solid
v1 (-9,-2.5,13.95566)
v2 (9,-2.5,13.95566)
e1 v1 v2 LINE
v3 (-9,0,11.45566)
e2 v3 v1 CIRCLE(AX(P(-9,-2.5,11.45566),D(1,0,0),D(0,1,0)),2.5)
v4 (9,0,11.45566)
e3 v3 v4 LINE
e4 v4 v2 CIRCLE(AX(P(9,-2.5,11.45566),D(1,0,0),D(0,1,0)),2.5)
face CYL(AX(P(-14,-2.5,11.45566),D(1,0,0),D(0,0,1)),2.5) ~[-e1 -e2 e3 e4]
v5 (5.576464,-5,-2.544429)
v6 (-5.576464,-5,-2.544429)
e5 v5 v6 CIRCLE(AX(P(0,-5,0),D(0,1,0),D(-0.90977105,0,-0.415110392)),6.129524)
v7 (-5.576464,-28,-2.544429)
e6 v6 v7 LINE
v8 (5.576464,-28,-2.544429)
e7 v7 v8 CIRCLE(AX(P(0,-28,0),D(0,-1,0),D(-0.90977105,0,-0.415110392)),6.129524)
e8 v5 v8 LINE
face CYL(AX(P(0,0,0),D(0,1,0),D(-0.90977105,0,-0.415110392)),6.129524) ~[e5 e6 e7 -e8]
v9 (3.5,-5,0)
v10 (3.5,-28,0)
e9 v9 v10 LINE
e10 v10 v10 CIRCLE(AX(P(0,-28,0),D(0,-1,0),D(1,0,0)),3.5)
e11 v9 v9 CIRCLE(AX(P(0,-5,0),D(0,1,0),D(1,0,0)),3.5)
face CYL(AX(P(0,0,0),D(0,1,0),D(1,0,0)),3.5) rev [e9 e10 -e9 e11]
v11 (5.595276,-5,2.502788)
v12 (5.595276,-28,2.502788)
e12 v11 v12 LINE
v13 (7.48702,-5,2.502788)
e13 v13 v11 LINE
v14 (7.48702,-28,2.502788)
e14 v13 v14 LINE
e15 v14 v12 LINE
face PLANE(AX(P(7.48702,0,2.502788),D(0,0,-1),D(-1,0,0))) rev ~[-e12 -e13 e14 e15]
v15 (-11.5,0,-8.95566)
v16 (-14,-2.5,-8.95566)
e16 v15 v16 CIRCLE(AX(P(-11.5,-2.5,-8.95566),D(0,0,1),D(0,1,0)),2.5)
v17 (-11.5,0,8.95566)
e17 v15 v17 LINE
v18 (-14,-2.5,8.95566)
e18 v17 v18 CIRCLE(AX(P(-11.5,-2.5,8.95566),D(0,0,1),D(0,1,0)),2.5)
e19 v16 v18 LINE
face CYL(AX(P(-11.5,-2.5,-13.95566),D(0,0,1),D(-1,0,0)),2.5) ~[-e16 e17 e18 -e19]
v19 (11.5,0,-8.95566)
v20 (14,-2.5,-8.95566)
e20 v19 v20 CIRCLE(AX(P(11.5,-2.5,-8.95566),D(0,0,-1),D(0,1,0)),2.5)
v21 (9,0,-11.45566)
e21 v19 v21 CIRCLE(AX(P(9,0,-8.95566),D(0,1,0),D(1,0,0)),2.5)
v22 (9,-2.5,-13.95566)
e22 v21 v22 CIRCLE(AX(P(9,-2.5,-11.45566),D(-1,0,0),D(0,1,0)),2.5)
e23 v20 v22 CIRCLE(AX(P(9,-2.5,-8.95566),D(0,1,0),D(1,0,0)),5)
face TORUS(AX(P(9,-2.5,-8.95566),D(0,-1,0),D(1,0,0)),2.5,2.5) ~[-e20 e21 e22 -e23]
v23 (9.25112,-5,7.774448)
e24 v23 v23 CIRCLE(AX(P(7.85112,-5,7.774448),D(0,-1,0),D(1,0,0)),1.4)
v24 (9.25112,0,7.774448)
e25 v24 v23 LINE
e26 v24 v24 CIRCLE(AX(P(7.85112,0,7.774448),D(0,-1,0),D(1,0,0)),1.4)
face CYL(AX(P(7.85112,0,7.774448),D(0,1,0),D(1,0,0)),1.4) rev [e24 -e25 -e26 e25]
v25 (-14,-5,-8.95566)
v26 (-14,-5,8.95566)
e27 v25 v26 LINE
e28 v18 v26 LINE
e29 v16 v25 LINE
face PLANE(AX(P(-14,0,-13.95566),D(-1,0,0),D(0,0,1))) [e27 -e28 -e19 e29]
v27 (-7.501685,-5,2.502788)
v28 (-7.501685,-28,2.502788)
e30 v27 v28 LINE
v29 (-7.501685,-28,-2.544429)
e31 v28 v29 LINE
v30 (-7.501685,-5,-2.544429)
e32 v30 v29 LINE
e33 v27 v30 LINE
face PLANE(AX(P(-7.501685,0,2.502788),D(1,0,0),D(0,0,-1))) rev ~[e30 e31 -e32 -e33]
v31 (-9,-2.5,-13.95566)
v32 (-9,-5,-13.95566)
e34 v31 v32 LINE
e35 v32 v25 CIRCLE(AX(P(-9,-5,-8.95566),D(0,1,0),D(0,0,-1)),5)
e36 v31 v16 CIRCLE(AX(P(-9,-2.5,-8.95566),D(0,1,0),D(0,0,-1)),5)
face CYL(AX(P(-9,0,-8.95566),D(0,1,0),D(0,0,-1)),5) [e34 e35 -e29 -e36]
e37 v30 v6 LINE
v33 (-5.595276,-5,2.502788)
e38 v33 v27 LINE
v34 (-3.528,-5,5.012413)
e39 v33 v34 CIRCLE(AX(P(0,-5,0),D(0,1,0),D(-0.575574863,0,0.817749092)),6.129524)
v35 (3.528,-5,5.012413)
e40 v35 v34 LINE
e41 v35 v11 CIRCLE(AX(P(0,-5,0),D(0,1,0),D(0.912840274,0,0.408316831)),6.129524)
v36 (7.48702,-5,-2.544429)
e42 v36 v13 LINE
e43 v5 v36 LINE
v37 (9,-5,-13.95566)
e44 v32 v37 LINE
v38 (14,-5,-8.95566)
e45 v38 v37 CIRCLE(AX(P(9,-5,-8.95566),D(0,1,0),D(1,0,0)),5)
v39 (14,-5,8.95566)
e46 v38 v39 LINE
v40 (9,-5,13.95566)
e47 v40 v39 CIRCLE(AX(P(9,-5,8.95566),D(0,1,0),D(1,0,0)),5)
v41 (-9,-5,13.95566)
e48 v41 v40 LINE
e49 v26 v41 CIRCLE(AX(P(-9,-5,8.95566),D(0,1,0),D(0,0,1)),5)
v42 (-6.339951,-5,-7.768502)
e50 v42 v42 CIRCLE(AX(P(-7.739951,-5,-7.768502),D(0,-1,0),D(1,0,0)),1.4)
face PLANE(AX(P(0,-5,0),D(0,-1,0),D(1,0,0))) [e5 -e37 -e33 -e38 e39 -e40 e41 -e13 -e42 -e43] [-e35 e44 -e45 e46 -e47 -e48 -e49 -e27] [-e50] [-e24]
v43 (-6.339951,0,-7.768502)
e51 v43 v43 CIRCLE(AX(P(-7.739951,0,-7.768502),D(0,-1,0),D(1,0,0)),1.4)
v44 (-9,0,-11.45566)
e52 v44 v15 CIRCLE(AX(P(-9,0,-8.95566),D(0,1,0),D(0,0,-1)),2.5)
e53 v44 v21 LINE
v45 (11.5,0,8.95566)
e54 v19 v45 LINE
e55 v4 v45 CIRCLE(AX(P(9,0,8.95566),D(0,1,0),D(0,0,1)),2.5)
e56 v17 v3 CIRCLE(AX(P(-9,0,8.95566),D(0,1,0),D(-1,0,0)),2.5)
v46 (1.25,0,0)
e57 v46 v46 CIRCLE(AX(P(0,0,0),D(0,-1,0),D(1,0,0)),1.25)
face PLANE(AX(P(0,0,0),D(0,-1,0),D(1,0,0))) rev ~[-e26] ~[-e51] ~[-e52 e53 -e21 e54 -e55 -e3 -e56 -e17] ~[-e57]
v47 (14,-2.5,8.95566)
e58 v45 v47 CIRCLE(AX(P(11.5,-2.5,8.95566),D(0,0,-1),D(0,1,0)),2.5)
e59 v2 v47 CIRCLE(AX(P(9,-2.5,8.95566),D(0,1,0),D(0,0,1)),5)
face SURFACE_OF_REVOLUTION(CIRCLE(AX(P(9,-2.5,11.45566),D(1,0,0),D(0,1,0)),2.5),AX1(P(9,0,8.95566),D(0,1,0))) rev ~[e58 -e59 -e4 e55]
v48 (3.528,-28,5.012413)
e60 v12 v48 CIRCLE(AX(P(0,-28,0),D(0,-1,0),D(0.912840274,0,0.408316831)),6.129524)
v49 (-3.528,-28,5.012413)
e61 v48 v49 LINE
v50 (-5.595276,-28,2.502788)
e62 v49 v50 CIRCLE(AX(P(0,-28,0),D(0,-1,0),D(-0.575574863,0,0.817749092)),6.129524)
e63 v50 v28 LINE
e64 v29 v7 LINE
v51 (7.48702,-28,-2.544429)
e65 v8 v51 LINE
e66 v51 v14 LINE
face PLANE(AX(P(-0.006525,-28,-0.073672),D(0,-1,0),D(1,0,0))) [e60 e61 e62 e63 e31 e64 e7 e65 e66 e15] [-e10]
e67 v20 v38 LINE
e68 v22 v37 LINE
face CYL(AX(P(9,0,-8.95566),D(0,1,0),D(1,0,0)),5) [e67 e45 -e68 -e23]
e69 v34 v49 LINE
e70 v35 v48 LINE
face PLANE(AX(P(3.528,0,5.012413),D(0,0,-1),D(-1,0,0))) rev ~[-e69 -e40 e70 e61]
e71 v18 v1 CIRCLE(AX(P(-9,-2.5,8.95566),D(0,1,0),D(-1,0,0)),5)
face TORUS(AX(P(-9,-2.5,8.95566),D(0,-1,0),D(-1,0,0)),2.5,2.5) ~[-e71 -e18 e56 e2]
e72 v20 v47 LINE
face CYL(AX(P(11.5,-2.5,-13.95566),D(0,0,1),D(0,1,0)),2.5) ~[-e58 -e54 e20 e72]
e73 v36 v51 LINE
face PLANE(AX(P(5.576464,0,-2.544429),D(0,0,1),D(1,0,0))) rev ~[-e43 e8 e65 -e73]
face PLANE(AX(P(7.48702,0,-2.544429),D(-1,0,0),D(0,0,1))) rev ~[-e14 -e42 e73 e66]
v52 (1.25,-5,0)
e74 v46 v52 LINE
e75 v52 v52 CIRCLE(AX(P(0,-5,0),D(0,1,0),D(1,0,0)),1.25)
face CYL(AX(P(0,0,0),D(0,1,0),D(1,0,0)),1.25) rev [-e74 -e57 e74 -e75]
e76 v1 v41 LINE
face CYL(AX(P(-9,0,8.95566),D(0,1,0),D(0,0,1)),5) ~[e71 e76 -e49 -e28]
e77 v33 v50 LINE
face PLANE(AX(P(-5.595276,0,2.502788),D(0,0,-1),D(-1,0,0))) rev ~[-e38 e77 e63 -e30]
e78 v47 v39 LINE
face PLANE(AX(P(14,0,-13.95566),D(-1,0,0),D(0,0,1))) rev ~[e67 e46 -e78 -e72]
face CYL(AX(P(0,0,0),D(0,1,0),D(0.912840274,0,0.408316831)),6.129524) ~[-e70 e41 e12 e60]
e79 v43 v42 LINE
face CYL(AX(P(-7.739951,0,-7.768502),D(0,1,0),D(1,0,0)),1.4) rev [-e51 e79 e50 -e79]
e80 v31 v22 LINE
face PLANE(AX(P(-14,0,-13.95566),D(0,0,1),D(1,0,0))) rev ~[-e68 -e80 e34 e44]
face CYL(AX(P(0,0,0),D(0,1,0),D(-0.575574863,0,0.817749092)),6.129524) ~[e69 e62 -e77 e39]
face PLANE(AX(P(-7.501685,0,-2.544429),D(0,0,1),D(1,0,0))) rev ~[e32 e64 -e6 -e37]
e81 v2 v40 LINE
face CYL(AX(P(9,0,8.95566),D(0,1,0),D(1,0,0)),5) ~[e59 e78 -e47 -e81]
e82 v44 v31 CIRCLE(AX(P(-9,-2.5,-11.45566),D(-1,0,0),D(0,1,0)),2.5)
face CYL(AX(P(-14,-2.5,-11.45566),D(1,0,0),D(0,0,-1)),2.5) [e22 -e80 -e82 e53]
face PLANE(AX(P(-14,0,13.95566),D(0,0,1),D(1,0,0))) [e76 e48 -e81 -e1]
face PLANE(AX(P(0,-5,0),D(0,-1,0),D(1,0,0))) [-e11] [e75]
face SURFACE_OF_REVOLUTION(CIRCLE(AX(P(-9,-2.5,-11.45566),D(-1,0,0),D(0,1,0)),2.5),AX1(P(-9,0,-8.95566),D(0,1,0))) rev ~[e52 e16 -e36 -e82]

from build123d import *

# Parameters (mm, degrees)
F0_R         = 3.5
F1_DEPTH     = 28
F2_W         = 28
F2_H         = 27.9113203287
F2_R         = 1.4
F3_DEPTH     = 5
F4_R         = 2.5
F5_T1_DEPTH  = 17.5
F5_T4_ANGLE  = 90
F5_T6_ANGLE  = 90
F5_T8_ANGLE  = 90
F5_T10_ANGLE = 90
F0_R_2       = 1.25
F6_DEPTH     = 10


# Not quite as in the source:
# - a fillet or chamfer that OpenCascade refuses, or shapes differently, is made with other operations: its cross-section is extruded or revolved along the edge and cut away or added


with BuildPart() as f1:
    # F0 (on Front) → F1 (new body)
    with BuildSketch(Plane.XZ):
        with BuildLine():
            Line((3.528, 5.0124127732), (-3.528, 5.0124127732))
            ThreePointArc((-3.528, 5.0124127732), (-4.7310778559, 3.8971743778), (-5.5952764673, 2.5027878582))
            Line((-5.5952764673, 2.5027878582), (-7.5016845949, 2.5027878582))
            Line((-7.5016845949, 2.5027878582), (-7.5016845949, -2.5444291532))
            Line((-7.5016845949, -2.5444291532), (-5.5764635831, -2.5444291532))
            ThreePointArc((-5.5764635831, -2.5444291532), (0, -6.1295241095), (5.5764635831, -2.5444291532))
            Line((5.5764635831, -2.5444291532), (7.4870199896, -2.5444291532))
            Line((7.4870199896, -2.5444291532), (7.4870199896, 2.5027878582))
            Line((7.4870199896, 2.5027878582), (5.5952764673, 2.5027878582))
            ThreePointArc((5.5952764673, 2.5027878582), (4.7310778559, 3.8971743778), (3.528, 5.0124127732))
        make_face()
        Circle(F0_R, mode=Mode.SUBTRACT)
    extrude(amount=F1_DEPTH)

    # F2 (on Front) → F3 (join)
    with BuildSketch(Plane.XZ):
        Rectangle(F2_W, F2_H)
        with Locations((-7.7399509028, -7.7685024589)):
            Circle(F2_R, mode=Mode.SUBTRACT)
        with Locations((7.8511200845, 7.7744480222)):
            Circle(F2_R, mode=Mode.SUBTRACT)
    extrude(amount=F3_DEPTH)

    # F4
    f4_edges = [f1.edges().sort_by_distance(p)[0] for p in [
        (14, 0, 0),
        (0, 0, -13.95566),
        (-14, 0, 0),
        (0, 0, 13.95566),
    ]]
    fillet(f4_edges, radius=F4_R)

    # F5: fillet of radius 5 on 4 edges, made by hand

    # F5_s2 → F5_t1 (cut)
    with BuildSketch(Plane.XZ):
        with BuildLine():
            ThreePointArc((-9, 13.9556601644), (-12.5355339059, 12.4911940703), (-14, 8.9556601644))
            Line((-14, 8.9556601644), (-14, 13.9556601644))
            Line((-14, 13.9556601644), (-9, 13.9556601644))
        make_face()
        with BuildLine():
            ThreePointArc((14, 8.9556601644), (12.5355339059, 12.4911940703), (9, 13.9556601644))
            Line((9, 13.9556601644), (14, 13.9556601644))
            Line((14, 13.9556601644), (14, 8.9556601644))
        make_face()
        with BuildLine():
            ThreePointArc((14, -8.9556601644), (12.5355339059, -12.4911940703), (9, -13.9556601644))
            Line((9, -13.9556601644), (14, -13.9556601644))
            Line((14, -13.9556601644), (14, -8.9556601644))
        make_face()
        with BuildLine():
            ThreePointArc((-9, -13.9556601644), (-12.5355339059, -12.4911940703), (-14, -8.9556601644))
            Line((-14, -8.9556601644), (-14, -13.9556601644))
            Line((-14, -13.9556601644), (-9, -13.9556601644))
        make_face()
    extrude(amount=F5_T1_DEPTH, mode=Mode.SUBTRACT)

    # F5_s3 → F5_t4 (revolve, cut)
    with BuildSketch(Plane.YZ.offset(-9)):
        with BuildLine():
            ThreePointArc((0, -11.4556601644), (-0.732233047, -13.2234271173), (-2.5, -13.9556601644))
            Line((-2.5, -13.9556601644), (0, -13.9556601644))
            Line((0, -13.9556601644), (0, -11.4556601644))
        make_face()
    revolve(axis=Axis((-9, 0, -8.9556601644), (0, 1, 0)), revolution_arc=F5_T4_ANGLE, mode=Mode.SUBTRACT)

    # F5_s5 → F5_t6 (revolve, cut)
    with BuildSketch(Plane.XY.offset(-8.9556601644)):
        with BuildLine():
            ThreePointArc((11.5, 0), (13.267766953, -0.732233047), (14, -2.5))
            Line((14, -2.5), (14, 0))
            Line((14, 0), (11.5, 0))
        make_face()
    revolve(axis=Axis((9, 0, -8.9556601644), (0, 1, 0)), revolution_arc=F5_T6_ANGLE, mode=Mode.SUBTRACT)

    # F5_s7 → F5_t8 (revolve, cut)
    with BuildSketch(Plane.YZ.offset(9)):
        with BuildLine():
            ThreePointArc((0, 11.4556601644), (-0.732233047, 13.2234271173), (-2.5, 13.9556601644))
            Line((-2.5, 13.9556601644), (0, 13.9556601644))
            Line((0, 13.9556601644), (0, 11.4556601644))
        make_face()
    revolve(axis=Axis((9, 0, 8.9556601644), (0, 1, 0)), revolution_arc=F5_T8_ANGLE, mode=Mode.SUBTRACT)

    # F5_s9 → F5_t10 (revolve, cut)
    with BuildSketch(Plane.XY.offset(8.9556601644)):
        with BuildLine():
            ThreePointArc((-11.5, 0), (-13.267766953, -0.732233047), (-14, -2.5))
            Line((-14, -2.5), (-14, 0))
            Line((-14, 0), (-11.5, 0))
        make_face()
    revolve(axis=Axis((-9, 0, 8.9556601644), (0, 1, 0)), revolution_arc=F5_T10_ANGLE, mode=Mode.SUBTRACT)

    # F0 (on Front) → F6 (cut)
    with BuildSketch(Plane.XZ):
        Circle(F0_R_2)
    extrude(amount=F6_DEPTH, mode=Mode.SUBTRACT)


solid = f1.part
